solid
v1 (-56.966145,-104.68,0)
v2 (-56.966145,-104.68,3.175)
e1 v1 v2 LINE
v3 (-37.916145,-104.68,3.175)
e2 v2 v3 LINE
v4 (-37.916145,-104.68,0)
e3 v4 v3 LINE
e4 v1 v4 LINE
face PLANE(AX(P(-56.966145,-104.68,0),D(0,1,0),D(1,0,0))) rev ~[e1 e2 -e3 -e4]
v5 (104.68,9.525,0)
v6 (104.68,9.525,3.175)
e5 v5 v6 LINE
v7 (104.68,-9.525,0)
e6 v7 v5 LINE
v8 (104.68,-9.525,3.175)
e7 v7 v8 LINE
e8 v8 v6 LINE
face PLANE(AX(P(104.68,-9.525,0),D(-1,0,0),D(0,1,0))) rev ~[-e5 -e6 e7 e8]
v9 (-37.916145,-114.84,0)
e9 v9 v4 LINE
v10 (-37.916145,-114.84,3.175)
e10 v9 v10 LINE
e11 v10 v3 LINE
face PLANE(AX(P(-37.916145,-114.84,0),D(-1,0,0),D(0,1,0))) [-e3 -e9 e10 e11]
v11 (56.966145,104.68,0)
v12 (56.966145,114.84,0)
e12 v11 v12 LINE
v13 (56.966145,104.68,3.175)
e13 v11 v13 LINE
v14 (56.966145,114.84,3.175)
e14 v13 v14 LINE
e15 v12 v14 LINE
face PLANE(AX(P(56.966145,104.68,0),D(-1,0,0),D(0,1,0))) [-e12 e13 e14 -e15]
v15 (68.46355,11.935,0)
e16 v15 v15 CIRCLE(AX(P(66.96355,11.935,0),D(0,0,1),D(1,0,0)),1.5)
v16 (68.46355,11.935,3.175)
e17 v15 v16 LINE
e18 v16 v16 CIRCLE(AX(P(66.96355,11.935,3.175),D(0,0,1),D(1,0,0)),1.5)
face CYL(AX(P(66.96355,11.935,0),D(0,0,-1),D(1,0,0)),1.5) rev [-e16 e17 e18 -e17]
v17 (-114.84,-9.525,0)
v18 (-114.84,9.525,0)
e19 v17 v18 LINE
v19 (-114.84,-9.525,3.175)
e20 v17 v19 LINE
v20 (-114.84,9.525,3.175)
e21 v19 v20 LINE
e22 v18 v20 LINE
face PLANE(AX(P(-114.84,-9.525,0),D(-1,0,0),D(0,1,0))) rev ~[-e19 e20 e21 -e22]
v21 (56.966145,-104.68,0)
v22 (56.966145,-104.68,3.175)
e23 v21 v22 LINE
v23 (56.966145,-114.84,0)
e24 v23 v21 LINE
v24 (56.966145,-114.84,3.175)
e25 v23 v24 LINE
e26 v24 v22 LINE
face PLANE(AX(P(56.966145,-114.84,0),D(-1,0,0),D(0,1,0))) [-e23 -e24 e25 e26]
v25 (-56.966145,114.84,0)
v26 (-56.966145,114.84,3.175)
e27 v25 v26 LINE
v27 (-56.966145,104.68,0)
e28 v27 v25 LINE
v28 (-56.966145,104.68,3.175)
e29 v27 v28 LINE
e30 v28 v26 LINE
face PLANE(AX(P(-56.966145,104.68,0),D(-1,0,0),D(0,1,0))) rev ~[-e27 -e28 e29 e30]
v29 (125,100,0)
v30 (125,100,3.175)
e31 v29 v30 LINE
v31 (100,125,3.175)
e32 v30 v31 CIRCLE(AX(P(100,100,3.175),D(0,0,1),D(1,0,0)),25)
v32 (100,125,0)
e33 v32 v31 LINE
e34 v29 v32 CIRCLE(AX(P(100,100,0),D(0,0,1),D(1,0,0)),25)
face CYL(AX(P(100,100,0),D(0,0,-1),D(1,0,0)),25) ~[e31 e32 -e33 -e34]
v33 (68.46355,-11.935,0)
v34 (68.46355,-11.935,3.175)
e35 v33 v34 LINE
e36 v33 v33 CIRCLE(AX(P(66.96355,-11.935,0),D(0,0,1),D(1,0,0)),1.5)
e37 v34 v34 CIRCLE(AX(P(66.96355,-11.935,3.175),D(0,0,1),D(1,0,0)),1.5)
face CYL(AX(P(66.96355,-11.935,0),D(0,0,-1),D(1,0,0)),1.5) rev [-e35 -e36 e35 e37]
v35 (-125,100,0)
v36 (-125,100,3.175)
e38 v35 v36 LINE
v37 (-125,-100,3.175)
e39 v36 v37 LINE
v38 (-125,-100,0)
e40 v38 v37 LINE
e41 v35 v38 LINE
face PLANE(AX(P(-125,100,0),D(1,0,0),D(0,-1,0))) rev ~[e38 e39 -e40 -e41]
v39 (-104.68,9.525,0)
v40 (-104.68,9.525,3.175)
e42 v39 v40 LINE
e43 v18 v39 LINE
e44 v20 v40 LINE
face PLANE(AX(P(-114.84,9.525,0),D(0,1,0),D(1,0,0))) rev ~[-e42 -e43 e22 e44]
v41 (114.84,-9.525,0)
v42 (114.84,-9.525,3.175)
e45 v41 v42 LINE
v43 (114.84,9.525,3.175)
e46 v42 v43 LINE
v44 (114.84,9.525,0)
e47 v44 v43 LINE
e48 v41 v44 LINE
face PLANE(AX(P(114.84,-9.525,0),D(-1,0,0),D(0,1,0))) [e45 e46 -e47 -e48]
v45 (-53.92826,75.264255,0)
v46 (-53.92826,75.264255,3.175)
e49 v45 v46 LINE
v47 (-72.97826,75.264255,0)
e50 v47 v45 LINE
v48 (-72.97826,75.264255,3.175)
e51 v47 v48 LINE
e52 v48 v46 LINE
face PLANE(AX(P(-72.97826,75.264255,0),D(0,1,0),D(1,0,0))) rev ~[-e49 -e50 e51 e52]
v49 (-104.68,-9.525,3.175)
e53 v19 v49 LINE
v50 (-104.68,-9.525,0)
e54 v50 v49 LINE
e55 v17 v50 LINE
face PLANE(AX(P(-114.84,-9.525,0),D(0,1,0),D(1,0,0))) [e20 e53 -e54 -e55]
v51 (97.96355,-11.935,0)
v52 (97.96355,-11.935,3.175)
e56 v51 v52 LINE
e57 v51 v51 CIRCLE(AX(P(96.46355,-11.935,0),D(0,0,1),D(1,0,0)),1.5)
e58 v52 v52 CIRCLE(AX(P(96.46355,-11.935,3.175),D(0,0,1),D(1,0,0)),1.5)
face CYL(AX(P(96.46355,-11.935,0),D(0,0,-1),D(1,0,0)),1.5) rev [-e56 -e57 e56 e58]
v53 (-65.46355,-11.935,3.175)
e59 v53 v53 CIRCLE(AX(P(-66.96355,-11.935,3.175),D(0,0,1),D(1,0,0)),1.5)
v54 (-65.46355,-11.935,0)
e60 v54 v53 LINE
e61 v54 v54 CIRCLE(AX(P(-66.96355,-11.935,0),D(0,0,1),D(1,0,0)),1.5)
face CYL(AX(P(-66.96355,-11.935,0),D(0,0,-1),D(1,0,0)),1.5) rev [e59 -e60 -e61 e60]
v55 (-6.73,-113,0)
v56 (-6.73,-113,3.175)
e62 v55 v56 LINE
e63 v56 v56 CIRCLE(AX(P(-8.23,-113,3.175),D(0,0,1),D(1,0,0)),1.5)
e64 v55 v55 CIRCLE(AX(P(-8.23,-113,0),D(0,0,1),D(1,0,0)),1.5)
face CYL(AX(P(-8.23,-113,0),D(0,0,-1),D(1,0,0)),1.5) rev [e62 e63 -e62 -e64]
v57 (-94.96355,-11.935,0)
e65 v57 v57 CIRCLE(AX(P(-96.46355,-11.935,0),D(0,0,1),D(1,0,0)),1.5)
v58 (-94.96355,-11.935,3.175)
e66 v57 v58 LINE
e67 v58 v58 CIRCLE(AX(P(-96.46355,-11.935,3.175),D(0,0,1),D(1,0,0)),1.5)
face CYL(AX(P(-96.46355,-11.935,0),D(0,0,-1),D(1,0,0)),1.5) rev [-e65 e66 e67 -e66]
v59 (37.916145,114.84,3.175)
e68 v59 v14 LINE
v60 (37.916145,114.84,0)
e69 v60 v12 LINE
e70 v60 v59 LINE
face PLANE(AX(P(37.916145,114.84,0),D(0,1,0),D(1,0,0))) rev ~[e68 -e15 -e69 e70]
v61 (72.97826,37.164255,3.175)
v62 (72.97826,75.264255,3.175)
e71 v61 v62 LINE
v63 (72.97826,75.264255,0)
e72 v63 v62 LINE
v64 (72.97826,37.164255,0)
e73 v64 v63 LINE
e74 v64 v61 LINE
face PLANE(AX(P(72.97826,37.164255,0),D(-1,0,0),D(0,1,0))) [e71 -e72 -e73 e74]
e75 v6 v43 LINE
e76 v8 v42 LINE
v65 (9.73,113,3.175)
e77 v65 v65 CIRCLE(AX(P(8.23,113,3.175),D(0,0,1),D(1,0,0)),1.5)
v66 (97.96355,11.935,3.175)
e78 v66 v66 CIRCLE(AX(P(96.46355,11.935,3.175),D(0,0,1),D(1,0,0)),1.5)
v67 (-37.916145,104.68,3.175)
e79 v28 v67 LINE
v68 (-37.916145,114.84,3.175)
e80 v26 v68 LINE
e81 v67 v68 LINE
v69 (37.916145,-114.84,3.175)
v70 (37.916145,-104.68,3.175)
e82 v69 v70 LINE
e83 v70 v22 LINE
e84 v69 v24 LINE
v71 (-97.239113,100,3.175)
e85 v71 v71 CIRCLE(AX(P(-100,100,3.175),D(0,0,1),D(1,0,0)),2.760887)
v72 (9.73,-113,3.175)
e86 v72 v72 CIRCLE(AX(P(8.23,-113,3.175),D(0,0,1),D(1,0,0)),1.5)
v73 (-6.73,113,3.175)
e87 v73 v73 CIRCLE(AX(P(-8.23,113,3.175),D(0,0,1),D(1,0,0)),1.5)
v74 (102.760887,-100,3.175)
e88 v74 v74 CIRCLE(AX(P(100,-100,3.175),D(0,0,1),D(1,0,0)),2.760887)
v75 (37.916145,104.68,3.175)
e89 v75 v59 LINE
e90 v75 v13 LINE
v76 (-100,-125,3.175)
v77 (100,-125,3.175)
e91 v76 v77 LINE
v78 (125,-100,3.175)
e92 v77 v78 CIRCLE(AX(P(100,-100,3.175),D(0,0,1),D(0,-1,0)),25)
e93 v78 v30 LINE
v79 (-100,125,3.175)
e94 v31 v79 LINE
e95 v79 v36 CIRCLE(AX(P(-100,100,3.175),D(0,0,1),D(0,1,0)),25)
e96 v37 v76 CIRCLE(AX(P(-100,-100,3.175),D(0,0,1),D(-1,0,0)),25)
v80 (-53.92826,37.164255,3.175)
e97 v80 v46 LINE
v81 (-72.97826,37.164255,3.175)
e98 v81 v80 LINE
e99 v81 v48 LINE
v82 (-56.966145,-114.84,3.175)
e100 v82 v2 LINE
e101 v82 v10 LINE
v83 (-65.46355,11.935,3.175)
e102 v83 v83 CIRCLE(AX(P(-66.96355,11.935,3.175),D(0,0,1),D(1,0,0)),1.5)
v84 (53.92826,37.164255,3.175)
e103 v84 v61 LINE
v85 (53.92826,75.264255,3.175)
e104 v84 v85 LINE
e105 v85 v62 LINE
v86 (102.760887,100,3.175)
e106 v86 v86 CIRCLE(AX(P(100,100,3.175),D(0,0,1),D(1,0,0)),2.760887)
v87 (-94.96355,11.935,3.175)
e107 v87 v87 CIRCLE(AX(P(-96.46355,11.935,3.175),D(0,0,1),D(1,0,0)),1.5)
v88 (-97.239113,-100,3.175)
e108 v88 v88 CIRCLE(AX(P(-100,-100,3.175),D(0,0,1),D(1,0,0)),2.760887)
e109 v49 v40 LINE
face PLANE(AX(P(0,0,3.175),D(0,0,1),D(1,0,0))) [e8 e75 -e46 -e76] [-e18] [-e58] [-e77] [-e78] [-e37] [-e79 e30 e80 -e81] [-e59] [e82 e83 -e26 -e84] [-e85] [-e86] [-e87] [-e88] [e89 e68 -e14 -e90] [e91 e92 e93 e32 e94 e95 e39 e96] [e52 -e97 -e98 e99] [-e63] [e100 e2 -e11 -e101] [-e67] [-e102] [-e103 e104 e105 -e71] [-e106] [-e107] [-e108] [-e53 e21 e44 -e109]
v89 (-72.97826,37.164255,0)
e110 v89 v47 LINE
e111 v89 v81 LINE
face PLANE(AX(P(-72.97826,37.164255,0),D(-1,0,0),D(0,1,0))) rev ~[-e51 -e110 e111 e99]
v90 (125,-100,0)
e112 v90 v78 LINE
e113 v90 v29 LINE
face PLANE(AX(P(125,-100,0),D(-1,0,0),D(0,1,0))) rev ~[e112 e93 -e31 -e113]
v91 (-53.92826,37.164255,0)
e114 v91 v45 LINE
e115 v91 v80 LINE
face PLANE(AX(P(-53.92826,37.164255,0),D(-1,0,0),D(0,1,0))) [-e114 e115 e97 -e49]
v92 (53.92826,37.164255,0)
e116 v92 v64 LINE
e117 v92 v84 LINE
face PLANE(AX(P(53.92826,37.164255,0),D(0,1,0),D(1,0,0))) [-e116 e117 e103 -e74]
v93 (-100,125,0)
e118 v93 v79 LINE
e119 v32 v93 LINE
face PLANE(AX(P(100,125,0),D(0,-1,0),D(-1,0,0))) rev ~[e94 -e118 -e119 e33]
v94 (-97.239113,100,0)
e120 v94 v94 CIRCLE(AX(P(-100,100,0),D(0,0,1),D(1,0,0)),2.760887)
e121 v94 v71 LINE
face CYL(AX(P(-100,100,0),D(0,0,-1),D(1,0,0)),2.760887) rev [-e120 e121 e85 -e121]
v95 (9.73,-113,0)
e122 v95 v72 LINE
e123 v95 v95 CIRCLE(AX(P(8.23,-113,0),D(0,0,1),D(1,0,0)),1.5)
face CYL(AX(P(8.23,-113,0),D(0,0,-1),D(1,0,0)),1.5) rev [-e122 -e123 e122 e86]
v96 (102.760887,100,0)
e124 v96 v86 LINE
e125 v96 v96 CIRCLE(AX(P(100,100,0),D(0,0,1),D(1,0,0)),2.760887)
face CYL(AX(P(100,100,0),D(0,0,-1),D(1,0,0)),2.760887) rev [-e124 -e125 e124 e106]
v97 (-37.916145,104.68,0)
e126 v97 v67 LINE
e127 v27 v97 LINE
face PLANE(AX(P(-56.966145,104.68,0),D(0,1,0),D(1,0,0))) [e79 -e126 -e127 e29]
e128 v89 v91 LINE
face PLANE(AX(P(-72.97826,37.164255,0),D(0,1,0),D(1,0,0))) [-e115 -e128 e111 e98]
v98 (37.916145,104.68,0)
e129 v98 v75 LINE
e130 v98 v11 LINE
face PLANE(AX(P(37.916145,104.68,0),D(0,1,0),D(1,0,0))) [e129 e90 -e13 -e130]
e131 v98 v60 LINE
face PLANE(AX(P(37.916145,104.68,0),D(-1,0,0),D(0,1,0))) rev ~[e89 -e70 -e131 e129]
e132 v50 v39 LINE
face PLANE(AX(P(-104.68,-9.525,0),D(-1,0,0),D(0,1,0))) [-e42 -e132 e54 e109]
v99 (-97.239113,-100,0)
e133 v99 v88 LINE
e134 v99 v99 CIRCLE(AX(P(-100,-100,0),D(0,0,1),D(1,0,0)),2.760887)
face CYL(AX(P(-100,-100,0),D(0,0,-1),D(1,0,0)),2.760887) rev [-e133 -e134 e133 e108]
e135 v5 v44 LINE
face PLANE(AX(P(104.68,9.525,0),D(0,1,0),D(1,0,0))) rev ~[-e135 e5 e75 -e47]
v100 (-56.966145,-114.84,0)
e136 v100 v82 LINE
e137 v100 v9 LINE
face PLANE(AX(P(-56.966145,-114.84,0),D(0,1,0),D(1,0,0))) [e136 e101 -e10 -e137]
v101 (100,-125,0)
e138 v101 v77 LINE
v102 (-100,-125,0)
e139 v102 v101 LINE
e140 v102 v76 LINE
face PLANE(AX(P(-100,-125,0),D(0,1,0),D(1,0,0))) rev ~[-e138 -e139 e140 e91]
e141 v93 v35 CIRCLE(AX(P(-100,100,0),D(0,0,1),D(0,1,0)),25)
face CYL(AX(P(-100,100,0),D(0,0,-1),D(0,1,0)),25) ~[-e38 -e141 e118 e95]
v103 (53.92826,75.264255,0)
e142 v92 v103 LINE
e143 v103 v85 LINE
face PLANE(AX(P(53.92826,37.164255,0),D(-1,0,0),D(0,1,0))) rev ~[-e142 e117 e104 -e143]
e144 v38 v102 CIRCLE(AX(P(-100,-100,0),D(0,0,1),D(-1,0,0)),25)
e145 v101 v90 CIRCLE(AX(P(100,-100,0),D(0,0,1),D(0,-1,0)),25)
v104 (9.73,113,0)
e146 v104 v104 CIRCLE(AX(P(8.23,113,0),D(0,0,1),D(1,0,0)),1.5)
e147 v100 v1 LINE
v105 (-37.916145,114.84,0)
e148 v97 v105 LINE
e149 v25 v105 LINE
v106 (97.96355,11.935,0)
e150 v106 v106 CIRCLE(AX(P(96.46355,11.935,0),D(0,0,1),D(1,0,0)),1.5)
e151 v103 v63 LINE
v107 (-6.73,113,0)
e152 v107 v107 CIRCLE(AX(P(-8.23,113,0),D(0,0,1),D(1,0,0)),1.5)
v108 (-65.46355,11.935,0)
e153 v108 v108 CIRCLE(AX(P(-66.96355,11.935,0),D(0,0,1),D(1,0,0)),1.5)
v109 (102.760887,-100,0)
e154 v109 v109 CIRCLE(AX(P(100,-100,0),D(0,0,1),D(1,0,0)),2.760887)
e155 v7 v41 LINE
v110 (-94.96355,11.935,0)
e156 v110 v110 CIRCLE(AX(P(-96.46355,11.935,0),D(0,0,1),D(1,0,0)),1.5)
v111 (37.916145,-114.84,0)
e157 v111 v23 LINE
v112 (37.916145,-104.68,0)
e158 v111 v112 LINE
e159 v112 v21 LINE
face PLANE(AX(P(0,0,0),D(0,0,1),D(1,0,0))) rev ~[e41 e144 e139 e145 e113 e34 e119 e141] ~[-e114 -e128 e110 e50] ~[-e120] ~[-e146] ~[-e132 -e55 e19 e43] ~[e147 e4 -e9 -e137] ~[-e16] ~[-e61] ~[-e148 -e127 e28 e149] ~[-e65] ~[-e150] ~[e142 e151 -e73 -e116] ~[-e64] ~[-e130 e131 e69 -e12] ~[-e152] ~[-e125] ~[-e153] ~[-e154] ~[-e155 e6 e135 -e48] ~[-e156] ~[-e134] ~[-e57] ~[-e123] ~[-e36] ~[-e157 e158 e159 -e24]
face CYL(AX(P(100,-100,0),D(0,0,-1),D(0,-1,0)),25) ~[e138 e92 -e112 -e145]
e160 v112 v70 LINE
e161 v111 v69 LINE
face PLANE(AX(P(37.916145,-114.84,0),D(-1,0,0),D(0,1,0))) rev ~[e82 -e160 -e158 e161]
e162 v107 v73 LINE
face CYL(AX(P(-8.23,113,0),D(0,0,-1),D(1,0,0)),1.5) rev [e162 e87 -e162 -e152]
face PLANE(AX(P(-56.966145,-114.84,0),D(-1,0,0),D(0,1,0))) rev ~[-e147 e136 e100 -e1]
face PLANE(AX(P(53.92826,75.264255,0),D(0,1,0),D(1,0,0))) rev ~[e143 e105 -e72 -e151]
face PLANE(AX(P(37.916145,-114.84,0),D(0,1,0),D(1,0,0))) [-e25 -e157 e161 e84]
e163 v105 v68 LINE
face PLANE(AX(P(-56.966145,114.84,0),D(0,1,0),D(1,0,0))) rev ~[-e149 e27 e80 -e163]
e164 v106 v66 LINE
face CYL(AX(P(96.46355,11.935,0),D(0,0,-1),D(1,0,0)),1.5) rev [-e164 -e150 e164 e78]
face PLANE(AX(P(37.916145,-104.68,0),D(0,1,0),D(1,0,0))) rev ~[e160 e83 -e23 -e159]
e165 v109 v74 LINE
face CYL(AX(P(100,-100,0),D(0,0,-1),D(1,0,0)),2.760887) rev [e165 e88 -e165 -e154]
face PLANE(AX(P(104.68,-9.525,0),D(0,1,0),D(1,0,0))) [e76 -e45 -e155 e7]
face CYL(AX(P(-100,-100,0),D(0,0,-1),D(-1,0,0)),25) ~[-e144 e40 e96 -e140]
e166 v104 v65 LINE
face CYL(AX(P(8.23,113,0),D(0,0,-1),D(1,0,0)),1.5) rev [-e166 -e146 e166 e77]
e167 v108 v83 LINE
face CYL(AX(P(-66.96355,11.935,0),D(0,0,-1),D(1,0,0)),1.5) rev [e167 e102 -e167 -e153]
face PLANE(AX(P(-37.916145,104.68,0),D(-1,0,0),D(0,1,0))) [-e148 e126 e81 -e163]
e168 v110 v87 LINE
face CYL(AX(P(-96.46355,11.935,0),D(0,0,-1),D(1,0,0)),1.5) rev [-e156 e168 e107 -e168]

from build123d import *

# Parameters (mm, degrees)
F0_R     = 2.7608867496
F0_W     = 19.05
F0_H     = 10.16
F0_R_2   = 1.5
F0_W_2   = 10.16
F0_H_2   = 19.05
F0_H_3   = 38.1
F1_DEPTH = 3.175


# Not quite as in the source:
# - a length typed as a fraction of an inch, garbled in the dataset ("3 / 203.2 mm" for 3/8 in), is restored


with BuildPart() as f1:
    # F0 (on Top) → F1 (new body)
    with BuildSketch(Plane.XY):
        with BuildLine():
            Line((100, 125), (-100, 125))
            ThreePointArc((-100, 125), (-117.6776695297, 117.6776695297), (-125, 100))
            Line((-125, 100), (-125, -100))
            ThreePointArc((-125, -100), (-117.6776695297, -117.6776695297), (-100, -125))
            Line((-100, -125), (100, -125))
            ThreePointArc((100, -125), (117.6776695297, -117.6776695297), (125, -100))
            Line((125, -100), (125, 100))
            ThreePointArc((125, 100), (117.6776695297, 117.6776695297), (100, 125))
        make_face()
        with Locations((-100, -100)):
            Circle(F0_R, mode=Mode.SUBTRACT)
        with Locations((-47.4411445916, -109.76)):
            Rectangle(F0_W, F0_H, mode=Mode.SUBTRACT)
        with Locations((-8.23, -113)):
            Circle(F0_R_2, mode=Mode.SUBTRACT)
        with Locations((-96.4635497928, -11.935)):
            Circle(F0_R_2, mode=Mode.SUBTRACT)
        with Locations((-66.9635497928, -11.935)):
            Circle(F0_R_2, mode=Mode.SUBTRACT)
        with Locations((8.23, -113)):
            Circle(F0_R_2, mode=Mode.SUBTRACT)
        with Locations((47.4411445916, -109.76)):
            Rectangle(F0_W, F0_H, mode=Mode.SUBTRACT)
        with Locations((100, -100)):
            Circle(F0_R, mode=Mode.SUBTRACT)
        with Locations((66.9635497928, -11.935)):
            Circle(F0_R_2, mode=Mode.SUBTRACT)
        with Locations((96.4635497928, -11.935)):
            Circle(F0_R_2, mode=Mode.SUBTRACT)
        with Locations((-109.76, 0)):
            Rectangle(F0_W_2, F0_H_2, mode=Mode.SUBTRACT)
        with Locations((-96.4635497928, 11.935)):
            Circle(F0_R_2, mode=Mode.SUBTRACT)
        with Locations((-66.9635497928, 11.935)):
            Circle(F0_R_2, mode=Mode.SUBTRACT)
        with Locations((-63.4532595247, 56.2142550719)):
            Rectangle(F0_W, F0_H_3, mode=Mode.SUBTRACT)
        with Locations((-100, 100)):
            Circle(F0_R, mode=Mode.SUBTRACT)
        with Locations((-47.4411445916, 109.76)):
            Rectangle(F0_W, F0_H, mode=Mode.SUBTRACT)
        with Locations((-8.23, 113)):
            Circle(F0_R_2, mode=Mode.SUBTRACT)
        with Locations((66.9635497928, 11.935)):
            Circle(F0_R_2, mode=Mode.SUBTRACT)
        with Locations((96.4635497928, 11.935)):
            Circle(F0_R_2, mode=Mode.SUBTRACT)
        with Locations((109.76, 0)):
            Rectangle(F0_W_2, F0_H_2, mode=Mode.SUBTRACT)
        with Locations((63.4532595247, 56.2142550719)):
            Rectangle(F0_W, F0_H_3, mode=Mode.SUBTRACT)
        with Locations((8.23, 113)):
            Circle(F0_R_2, mode=Mode.SUBTRACT)
        with Locations((47.4411445916, 109.76)):
            Rectangle(F0_W, F0_H, mode=Mode.SUBTRACT)
        with Locations((100, 100)):
            Circle(F0_R, mode=Mode.SUBTRACT)
    extrude(amount=F1_DEPTH)


solid = f1.part
